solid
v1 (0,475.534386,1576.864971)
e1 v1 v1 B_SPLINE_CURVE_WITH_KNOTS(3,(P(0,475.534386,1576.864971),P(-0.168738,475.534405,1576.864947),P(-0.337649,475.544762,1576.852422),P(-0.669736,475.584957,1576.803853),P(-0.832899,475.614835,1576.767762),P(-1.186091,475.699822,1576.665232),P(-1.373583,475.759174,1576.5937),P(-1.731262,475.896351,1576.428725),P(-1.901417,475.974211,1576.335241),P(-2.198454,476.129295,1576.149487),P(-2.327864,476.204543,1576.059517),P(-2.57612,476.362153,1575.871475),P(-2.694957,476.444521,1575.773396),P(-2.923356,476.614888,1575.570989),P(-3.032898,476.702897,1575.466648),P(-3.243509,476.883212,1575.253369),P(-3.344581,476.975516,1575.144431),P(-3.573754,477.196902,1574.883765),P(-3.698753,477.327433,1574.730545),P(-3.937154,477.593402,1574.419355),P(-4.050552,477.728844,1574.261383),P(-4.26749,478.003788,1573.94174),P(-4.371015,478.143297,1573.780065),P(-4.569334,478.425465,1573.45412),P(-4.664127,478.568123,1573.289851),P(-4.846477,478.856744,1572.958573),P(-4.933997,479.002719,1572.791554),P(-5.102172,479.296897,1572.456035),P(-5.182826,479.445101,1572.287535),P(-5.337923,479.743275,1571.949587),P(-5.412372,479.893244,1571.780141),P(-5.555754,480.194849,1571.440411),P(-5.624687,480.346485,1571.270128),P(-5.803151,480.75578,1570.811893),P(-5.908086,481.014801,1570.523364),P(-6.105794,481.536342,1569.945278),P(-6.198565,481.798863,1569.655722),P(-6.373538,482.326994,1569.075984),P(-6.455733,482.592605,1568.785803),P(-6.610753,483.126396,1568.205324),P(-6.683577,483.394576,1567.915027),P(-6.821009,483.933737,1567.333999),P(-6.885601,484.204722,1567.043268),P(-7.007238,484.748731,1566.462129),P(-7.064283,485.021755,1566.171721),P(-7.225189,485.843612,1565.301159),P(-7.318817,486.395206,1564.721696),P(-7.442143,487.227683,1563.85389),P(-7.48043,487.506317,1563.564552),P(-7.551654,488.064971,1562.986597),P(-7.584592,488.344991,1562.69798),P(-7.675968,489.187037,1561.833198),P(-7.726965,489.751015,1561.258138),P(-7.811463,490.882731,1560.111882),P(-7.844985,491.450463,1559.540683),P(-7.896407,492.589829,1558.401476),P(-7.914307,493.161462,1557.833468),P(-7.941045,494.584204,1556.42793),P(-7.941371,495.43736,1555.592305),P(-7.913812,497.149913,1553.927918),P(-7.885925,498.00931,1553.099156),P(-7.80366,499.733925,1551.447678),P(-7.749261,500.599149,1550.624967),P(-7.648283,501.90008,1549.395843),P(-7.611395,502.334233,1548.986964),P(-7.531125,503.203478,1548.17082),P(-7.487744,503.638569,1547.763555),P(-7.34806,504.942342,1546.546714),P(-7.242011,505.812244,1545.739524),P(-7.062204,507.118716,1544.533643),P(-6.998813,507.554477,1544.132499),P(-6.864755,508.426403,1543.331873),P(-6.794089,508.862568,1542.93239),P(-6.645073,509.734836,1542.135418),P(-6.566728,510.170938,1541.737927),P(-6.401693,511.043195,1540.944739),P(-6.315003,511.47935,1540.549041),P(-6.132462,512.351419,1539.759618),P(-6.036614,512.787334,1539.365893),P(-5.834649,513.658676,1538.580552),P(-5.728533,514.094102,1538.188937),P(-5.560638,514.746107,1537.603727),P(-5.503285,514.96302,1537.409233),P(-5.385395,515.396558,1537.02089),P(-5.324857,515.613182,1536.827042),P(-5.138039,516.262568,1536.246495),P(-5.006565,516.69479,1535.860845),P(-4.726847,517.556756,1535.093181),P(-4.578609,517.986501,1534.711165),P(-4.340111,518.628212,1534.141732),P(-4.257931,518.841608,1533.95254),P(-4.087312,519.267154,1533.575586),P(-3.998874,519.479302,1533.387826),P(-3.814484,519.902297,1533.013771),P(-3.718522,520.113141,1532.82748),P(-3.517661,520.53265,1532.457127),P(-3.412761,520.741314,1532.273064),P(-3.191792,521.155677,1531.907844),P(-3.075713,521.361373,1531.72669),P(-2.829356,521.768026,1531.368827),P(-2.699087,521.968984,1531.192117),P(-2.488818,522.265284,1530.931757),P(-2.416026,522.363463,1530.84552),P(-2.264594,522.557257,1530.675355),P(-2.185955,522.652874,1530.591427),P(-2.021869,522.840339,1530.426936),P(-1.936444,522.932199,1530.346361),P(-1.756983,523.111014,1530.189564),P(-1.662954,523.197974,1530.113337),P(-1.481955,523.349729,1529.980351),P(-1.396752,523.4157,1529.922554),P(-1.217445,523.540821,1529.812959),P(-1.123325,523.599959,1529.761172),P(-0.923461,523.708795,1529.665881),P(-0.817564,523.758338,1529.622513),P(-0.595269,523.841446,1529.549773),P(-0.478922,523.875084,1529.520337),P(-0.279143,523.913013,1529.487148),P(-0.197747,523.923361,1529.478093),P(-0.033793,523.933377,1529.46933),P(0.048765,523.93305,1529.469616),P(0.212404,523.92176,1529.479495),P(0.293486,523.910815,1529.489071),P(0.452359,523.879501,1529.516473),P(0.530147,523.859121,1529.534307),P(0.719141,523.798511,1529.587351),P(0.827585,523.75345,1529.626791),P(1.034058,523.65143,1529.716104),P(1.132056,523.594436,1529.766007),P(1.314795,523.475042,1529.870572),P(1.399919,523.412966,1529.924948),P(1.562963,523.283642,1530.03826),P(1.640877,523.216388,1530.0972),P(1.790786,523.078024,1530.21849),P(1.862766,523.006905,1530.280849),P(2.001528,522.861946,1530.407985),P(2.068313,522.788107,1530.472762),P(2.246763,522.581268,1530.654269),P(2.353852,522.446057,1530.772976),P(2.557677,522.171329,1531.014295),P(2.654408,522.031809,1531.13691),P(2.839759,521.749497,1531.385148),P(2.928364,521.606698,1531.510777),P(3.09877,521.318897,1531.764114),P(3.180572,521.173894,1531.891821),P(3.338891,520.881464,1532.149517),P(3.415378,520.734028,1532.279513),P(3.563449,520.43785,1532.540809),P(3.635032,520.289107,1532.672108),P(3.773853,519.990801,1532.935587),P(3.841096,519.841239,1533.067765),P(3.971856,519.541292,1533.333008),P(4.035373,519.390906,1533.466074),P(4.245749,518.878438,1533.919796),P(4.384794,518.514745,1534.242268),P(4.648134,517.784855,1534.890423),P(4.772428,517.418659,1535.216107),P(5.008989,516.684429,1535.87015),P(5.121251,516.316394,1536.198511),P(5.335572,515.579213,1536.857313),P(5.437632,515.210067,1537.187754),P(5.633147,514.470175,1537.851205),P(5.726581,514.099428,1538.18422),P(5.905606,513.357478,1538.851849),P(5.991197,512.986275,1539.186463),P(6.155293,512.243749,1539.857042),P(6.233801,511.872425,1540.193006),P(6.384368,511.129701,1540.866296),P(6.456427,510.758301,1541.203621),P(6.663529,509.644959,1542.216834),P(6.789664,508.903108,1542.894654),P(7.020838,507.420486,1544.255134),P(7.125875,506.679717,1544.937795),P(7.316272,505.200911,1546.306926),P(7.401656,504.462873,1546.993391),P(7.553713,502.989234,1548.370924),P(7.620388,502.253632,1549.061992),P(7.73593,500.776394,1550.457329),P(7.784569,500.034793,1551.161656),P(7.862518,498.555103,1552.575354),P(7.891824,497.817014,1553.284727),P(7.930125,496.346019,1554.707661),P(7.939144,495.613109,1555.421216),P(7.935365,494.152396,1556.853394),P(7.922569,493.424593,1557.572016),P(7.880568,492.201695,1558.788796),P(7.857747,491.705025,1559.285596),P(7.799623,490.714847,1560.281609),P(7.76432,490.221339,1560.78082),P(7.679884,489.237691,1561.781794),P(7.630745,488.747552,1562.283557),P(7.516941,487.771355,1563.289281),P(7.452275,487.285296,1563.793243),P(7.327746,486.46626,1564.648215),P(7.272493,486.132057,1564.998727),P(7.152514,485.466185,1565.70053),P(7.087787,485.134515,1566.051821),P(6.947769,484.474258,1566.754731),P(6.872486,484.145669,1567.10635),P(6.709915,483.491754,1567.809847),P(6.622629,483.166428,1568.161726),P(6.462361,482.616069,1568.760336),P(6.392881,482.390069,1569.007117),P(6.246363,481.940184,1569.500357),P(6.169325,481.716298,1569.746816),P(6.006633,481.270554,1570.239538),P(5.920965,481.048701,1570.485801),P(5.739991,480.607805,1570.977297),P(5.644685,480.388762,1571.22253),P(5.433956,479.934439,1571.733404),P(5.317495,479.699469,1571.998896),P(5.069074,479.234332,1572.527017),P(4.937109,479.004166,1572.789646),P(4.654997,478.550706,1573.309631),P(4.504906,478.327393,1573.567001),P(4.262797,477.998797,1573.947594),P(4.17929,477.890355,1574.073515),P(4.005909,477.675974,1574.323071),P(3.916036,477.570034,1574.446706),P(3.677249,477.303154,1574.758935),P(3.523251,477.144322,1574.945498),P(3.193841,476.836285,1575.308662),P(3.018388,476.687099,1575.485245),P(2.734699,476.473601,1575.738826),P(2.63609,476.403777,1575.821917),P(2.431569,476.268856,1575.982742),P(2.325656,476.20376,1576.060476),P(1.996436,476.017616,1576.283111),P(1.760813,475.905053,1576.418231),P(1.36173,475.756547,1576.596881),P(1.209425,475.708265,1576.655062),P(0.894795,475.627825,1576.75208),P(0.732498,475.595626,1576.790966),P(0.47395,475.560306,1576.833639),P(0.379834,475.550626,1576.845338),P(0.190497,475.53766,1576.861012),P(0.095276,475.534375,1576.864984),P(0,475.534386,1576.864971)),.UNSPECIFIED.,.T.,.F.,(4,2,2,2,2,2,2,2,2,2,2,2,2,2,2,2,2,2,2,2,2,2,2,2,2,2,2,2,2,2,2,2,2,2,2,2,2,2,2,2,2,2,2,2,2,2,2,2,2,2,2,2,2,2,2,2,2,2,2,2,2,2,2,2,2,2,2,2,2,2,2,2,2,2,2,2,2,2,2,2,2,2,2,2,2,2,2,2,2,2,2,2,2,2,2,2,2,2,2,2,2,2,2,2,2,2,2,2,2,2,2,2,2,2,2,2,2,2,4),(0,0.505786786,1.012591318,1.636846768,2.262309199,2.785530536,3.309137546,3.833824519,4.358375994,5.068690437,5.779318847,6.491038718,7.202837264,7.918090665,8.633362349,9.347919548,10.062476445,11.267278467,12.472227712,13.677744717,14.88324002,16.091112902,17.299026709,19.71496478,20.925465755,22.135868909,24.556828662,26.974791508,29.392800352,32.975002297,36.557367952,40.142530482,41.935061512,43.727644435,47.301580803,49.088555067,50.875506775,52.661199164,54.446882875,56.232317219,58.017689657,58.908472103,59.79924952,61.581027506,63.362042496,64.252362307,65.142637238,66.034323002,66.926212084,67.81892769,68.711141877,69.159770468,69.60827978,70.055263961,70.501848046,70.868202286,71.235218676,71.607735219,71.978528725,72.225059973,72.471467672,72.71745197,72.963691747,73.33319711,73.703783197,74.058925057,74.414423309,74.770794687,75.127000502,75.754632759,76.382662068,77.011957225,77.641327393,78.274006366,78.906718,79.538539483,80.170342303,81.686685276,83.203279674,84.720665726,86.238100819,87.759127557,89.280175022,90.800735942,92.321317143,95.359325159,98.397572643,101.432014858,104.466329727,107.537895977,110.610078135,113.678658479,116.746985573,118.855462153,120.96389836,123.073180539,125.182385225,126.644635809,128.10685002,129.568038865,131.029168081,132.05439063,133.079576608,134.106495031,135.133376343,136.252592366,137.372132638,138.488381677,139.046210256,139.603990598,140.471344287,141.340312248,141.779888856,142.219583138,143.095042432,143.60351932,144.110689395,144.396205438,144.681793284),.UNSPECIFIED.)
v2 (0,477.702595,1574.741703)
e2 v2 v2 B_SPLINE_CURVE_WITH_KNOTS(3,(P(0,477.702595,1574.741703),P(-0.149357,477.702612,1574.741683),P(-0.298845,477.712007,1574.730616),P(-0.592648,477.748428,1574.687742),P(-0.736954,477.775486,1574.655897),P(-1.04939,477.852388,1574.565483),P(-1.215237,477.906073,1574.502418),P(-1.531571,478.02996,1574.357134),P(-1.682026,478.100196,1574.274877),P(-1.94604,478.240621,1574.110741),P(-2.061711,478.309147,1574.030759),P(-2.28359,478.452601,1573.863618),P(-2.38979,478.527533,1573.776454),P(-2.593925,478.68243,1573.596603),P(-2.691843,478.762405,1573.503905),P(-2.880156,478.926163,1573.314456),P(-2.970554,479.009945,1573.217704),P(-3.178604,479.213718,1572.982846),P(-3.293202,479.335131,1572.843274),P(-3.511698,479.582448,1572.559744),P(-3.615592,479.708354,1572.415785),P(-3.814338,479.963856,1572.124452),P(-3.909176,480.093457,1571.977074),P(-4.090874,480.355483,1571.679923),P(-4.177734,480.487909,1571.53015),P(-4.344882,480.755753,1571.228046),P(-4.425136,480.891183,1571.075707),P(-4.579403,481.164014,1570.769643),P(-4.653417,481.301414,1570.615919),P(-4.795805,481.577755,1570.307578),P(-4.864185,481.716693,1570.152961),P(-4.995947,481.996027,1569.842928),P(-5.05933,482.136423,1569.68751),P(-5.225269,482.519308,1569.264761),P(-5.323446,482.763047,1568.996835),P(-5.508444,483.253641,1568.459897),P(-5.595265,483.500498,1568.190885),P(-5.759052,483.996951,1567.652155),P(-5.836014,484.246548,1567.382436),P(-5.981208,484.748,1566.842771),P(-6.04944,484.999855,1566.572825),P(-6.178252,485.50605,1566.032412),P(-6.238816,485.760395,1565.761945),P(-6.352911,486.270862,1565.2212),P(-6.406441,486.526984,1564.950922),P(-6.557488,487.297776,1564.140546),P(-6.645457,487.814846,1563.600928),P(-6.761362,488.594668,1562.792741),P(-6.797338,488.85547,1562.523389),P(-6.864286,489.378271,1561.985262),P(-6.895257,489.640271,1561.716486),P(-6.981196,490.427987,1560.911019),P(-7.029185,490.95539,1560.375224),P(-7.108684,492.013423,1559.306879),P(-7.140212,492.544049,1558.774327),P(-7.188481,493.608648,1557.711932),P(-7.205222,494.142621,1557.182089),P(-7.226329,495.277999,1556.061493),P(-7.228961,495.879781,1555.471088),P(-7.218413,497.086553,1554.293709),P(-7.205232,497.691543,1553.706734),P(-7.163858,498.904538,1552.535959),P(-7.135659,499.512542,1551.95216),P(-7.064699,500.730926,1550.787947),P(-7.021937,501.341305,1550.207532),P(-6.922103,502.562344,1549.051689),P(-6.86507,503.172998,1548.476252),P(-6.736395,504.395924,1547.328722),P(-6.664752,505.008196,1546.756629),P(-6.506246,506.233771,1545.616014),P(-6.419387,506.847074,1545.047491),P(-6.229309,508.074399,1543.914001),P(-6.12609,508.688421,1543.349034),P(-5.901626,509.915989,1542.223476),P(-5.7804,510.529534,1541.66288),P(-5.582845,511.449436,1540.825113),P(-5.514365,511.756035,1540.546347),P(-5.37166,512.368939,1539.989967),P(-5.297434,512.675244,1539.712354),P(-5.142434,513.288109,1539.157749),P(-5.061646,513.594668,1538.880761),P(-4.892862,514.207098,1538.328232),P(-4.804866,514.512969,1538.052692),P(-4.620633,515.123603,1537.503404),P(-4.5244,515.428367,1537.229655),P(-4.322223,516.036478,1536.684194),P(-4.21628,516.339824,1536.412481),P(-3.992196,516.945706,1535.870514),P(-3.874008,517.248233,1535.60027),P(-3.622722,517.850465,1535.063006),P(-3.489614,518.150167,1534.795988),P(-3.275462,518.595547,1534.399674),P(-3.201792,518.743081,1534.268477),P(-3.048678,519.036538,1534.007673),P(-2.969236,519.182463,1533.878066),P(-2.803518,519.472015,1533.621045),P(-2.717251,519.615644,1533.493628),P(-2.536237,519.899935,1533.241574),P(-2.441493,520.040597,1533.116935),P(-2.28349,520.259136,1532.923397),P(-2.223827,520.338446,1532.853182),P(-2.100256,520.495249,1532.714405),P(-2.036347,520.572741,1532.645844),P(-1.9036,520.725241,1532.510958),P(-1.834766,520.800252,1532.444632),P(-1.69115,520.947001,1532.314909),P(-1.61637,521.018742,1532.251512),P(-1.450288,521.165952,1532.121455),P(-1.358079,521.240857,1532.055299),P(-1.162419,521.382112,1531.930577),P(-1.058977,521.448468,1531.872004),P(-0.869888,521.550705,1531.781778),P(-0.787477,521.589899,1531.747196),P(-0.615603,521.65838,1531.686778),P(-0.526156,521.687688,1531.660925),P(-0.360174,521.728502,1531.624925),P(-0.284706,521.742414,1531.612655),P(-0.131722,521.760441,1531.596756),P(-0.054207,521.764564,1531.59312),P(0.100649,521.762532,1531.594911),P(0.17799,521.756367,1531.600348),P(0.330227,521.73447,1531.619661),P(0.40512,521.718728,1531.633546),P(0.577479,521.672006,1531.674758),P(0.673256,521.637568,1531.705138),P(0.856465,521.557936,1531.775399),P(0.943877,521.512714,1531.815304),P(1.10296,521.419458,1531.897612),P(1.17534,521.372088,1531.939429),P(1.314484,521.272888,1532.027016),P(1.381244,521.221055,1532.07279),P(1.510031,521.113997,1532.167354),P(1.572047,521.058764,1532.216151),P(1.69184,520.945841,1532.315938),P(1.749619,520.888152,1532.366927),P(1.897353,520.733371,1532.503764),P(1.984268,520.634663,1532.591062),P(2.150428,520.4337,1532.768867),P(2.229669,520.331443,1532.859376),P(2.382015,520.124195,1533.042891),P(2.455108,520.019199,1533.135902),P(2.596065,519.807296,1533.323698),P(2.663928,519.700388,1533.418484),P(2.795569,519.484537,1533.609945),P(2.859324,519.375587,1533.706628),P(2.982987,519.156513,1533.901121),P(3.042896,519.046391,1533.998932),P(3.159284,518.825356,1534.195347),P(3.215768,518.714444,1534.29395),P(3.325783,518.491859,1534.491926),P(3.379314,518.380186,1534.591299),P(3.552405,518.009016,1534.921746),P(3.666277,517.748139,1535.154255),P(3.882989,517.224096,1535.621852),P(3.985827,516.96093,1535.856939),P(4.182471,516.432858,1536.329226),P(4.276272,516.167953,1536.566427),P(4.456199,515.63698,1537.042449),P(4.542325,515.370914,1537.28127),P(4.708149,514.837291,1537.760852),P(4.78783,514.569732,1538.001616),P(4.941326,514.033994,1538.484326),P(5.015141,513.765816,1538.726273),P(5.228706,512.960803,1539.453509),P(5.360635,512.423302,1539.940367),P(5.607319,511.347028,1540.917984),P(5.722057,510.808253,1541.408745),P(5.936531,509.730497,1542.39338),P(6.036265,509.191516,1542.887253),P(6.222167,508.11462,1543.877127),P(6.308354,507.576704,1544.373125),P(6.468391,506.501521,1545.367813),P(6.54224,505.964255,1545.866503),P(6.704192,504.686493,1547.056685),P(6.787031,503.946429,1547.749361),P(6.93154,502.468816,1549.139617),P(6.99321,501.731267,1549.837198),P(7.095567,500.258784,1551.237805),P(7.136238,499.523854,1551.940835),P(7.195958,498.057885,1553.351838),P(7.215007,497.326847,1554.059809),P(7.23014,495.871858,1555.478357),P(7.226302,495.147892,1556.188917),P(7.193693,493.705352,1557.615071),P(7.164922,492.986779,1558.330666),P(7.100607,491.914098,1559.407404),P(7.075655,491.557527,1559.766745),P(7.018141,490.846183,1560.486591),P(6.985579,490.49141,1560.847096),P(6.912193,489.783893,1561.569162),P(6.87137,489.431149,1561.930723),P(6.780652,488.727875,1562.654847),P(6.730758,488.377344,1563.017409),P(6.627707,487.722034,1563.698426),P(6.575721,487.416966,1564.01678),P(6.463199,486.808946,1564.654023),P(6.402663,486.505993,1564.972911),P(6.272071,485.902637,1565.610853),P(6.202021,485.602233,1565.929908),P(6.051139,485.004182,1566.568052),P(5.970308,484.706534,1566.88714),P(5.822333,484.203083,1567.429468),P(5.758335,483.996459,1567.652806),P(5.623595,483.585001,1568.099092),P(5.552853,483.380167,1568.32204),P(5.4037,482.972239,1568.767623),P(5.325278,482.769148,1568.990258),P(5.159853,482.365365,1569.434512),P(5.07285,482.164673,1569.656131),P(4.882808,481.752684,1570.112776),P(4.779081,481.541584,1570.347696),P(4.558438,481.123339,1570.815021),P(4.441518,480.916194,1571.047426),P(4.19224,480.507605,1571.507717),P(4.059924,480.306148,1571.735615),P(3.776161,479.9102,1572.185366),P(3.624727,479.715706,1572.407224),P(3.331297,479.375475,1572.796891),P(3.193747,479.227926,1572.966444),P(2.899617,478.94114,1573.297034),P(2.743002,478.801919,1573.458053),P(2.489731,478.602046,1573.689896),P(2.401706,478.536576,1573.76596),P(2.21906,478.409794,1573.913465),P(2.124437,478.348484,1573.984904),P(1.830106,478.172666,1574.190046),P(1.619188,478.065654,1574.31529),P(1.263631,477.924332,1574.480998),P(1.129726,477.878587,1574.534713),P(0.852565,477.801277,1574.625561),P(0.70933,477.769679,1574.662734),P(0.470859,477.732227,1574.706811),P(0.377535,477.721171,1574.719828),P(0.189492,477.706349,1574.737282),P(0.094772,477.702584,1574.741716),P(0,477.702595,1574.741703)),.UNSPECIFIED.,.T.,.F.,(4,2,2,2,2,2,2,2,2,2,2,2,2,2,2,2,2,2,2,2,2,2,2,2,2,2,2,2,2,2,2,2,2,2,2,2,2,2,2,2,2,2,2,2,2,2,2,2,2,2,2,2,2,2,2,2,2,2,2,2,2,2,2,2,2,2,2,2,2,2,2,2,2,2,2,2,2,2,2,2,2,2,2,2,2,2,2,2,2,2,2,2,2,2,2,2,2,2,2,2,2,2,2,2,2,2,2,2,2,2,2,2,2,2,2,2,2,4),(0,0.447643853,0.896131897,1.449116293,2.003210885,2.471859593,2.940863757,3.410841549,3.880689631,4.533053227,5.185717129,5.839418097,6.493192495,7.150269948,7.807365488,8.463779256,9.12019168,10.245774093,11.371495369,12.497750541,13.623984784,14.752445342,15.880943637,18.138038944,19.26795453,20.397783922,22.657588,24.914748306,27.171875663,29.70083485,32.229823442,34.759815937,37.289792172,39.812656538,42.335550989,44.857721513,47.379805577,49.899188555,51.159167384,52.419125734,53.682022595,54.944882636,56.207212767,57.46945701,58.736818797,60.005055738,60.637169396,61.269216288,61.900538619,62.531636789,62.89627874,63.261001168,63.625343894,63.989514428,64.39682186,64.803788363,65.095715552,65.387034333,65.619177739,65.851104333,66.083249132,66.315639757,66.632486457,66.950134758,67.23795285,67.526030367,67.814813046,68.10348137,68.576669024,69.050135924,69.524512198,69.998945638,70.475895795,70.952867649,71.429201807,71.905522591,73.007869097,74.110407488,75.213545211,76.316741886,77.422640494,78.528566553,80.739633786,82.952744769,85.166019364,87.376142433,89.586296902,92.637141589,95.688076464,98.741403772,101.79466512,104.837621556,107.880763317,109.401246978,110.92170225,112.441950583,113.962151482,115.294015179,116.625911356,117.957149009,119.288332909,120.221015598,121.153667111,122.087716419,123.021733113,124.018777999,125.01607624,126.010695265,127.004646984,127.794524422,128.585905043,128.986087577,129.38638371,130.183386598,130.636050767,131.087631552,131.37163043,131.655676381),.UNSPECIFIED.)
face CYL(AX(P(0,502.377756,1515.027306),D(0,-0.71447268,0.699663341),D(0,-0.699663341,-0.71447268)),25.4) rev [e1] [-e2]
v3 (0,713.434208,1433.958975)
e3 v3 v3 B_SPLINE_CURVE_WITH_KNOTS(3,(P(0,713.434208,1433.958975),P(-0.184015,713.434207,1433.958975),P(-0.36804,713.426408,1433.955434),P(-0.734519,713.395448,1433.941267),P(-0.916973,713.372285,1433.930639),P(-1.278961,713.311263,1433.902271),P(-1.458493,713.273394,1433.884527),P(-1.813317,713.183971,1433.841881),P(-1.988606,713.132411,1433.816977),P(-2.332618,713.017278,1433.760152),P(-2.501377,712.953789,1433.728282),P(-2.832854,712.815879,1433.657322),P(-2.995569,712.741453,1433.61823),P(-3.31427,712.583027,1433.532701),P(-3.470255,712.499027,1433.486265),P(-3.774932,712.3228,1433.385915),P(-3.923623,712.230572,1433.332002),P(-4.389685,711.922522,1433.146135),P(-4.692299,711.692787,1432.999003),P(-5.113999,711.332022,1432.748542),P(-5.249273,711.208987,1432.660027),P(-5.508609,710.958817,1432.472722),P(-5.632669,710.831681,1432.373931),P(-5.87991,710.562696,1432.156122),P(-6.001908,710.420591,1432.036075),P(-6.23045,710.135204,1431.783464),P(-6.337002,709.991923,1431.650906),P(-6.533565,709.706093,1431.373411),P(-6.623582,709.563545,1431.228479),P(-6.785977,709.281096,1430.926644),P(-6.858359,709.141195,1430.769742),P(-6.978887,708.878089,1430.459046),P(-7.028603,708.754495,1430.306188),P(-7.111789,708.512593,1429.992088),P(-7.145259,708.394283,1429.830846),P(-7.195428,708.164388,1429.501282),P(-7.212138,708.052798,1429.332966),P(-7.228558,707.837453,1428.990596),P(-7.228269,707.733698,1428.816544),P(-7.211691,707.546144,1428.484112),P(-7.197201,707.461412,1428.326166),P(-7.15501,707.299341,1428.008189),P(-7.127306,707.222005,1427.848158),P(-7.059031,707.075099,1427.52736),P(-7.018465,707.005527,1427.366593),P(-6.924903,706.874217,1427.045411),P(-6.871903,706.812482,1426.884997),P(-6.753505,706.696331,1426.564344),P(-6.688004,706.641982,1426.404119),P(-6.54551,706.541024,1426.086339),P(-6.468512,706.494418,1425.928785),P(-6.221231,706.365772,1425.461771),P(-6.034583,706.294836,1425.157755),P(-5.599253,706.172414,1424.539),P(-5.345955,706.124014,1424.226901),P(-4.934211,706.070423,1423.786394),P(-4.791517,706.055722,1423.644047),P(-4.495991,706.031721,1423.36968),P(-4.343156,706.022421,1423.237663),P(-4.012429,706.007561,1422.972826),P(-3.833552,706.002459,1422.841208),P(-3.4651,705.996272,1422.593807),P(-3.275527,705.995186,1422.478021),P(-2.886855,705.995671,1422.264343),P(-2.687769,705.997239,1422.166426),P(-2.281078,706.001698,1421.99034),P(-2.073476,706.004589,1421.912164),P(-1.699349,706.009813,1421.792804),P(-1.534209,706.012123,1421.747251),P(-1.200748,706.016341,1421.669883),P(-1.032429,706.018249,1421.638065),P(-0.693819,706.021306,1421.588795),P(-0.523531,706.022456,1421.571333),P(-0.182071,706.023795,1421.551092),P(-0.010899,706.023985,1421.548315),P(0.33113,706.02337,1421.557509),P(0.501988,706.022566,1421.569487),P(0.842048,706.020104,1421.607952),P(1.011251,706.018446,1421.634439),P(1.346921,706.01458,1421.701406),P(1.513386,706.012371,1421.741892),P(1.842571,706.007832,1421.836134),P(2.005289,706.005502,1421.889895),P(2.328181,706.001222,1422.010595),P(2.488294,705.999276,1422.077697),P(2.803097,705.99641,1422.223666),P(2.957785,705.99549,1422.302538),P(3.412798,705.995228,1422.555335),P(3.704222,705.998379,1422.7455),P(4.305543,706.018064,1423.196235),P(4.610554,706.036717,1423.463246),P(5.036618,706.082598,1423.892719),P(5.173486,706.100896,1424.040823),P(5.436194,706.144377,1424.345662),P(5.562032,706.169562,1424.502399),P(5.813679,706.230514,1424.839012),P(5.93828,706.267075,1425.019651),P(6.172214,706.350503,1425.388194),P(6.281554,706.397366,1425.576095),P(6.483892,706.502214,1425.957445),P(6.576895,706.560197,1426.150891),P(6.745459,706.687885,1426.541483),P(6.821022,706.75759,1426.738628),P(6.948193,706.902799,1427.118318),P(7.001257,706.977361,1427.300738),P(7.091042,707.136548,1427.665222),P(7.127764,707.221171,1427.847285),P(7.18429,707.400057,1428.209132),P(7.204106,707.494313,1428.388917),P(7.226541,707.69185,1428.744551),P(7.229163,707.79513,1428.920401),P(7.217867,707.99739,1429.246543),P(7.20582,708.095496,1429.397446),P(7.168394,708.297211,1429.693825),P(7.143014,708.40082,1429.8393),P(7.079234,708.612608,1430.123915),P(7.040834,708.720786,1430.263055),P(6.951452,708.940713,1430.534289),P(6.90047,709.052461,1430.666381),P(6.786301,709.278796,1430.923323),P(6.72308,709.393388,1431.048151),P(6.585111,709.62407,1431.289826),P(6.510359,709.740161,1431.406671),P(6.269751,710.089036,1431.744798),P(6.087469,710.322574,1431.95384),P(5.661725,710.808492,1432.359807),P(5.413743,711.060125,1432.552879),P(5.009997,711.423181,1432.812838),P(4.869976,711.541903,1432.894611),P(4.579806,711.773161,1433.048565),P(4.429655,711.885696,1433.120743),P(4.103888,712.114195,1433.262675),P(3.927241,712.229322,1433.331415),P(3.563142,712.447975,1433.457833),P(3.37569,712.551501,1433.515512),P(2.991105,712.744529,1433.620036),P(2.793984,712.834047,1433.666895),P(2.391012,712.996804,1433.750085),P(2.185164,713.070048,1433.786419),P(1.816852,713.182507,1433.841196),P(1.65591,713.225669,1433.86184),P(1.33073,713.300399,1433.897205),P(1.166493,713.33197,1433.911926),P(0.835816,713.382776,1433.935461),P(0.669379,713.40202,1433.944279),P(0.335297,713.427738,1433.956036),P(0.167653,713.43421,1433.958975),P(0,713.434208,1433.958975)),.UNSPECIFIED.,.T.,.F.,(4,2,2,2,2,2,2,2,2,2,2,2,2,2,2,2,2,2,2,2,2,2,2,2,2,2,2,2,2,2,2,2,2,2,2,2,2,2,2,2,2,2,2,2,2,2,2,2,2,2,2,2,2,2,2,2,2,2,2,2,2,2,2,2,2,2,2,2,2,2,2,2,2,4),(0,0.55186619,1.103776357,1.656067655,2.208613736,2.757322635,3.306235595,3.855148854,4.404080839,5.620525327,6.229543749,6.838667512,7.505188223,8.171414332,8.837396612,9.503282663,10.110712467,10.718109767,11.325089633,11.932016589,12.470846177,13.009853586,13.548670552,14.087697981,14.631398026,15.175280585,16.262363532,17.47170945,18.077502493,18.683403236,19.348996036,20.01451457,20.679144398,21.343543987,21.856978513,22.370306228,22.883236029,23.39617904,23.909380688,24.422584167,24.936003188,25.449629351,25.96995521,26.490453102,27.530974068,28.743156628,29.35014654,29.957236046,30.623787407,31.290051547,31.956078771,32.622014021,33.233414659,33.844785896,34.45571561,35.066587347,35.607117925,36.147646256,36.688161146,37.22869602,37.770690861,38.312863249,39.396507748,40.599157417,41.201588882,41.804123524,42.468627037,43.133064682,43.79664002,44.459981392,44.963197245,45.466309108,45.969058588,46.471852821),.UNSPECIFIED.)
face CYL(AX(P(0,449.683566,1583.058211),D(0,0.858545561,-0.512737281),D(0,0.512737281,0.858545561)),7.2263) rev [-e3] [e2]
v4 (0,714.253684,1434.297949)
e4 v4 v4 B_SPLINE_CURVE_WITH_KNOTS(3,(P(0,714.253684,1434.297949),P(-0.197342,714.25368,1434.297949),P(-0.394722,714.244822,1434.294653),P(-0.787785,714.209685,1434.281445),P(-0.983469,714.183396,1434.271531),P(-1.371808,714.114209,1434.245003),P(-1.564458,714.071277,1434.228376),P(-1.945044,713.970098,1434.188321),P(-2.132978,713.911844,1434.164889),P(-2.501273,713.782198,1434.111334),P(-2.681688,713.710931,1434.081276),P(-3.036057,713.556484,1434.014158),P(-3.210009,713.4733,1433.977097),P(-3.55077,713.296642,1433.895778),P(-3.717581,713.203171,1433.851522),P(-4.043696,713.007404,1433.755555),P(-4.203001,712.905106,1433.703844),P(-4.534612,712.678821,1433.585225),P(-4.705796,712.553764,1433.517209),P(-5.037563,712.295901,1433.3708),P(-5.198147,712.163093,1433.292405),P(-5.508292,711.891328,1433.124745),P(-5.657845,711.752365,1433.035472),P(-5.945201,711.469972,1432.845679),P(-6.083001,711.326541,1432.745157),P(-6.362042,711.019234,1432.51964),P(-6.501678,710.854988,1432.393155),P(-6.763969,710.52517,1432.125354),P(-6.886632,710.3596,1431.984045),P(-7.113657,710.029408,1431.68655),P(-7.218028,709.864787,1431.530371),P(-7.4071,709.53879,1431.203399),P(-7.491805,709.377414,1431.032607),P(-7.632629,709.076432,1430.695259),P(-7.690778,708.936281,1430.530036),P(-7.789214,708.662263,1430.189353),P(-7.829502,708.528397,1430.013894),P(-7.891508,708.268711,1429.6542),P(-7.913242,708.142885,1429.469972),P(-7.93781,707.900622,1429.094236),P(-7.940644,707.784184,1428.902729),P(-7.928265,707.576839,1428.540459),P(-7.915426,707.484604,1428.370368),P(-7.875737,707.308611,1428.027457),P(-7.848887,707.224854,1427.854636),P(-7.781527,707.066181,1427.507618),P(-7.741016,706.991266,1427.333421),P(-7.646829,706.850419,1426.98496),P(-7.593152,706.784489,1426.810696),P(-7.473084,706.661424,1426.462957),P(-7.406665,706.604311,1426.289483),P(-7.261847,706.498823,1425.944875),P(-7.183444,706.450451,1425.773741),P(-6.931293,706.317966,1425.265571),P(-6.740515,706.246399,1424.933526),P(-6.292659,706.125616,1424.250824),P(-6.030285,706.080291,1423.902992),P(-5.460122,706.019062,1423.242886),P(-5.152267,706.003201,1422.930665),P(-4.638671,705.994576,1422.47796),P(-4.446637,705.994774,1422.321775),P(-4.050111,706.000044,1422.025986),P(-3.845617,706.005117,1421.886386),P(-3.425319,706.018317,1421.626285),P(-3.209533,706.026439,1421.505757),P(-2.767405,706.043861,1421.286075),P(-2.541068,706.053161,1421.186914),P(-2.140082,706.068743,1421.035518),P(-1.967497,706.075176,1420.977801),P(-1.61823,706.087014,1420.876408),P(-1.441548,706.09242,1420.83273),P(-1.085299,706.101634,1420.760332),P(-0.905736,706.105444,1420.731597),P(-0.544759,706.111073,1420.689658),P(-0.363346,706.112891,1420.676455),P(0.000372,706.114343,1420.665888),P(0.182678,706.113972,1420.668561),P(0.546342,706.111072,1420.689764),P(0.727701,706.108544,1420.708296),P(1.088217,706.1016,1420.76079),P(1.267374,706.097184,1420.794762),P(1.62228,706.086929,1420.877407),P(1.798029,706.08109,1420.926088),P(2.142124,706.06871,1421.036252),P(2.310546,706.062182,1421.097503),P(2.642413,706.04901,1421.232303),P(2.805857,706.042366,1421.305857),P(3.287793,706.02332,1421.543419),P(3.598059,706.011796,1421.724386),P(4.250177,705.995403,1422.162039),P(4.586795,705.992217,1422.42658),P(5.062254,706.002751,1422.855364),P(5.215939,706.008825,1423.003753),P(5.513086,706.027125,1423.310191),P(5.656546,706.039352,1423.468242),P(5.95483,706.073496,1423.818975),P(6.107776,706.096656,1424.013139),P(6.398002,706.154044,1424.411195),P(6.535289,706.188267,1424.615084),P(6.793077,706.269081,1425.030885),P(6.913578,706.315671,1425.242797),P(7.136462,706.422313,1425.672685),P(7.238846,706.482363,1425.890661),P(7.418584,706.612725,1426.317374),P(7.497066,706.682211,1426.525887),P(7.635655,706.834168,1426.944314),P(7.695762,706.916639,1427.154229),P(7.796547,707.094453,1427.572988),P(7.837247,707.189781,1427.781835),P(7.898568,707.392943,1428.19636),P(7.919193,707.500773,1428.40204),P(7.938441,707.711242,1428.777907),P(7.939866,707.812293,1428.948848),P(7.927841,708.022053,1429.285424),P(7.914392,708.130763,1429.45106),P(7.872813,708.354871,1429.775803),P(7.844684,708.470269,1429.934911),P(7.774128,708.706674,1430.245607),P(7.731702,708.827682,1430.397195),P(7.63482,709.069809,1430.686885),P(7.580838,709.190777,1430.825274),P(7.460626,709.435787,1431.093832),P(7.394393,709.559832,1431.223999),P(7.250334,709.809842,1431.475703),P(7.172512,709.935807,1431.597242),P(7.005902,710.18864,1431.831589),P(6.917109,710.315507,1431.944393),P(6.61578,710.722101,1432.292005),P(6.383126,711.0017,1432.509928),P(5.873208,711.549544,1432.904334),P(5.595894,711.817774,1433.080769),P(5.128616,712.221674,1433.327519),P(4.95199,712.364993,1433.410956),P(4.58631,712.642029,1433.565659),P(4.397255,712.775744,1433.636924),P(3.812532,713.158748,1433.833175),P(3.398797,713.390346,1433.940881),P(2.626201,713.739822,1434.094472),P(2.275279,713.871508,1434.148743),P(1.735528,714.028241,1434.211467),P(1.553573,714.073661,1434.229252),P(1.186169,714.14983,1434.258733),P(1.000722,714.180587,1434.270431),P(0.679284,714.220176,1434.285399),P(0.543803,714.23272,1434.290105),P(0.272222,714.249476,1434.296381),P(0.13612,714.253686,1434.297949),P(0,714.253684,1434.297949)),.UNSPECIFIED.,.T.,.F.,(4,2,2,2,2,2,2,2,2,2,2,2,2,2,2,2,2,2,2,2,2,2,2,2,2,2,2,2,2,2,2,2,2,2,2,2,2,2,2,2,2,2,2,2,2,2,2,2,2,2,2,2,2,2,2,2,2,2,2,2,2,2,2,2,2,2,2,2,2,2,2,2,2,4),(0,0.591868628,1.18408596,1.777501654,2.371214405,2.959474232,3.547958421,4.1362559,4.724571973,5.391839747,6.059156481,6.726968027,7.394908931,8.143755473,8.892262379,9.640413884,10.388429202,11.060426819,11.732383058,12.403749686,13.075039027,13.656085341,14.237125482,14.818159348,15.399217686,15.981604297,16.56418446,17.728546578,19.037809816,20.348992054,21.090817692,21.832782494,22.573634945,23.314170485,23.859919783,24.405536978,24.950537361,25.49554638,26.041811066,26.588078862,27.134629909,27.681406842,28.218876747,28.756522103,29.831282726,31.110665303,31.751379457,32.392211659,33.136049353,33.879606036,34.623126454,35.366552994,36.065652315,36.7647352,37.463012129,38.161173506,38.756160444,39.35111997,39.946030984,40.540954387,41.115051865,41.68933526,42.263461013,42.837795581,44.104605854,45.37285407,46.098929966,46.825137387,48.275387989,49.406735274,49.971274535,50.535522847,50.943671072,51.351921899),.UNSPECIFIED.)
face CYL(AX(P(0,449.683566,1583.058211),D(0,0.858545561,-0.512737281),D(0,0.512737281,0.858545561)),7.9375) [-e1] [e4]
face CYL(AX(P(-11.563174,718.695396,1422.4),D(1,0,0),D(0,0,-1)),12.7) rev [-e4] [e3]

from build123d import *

# Parameters (mm, degrees)
BOSS_EXTRUDE1_OUTLINE_R   = 7.9375
BOSS_EXTRUDE1_OUTLINE_R_2 = 7.2263
BOSS_EXTRUDE1_DEPTH       = 287.964754837
BOSS_EXTRUDE1_START       = -765
BOSS_EXTRUDE1_2_DEPTH     = 284.980617027
CUT_EXTRUDE1_DEPTH        = 1735.634181442
CUT_EXTRUDE1_DEPTH_BACK   = 1735.634181442
SKETCH3_R                 = 12.7


with BuildPart() as part:
    # Boss-Extrude1: read off the stored shape, not the designer's step
    # Boss-Extrude1 outline → Boss-Extrude1 (new body)
    with BuildSketch(Plane(origin=(0, 718.69539577, 1422.4), x_dir=(-1, 0, 0), z_dir=(0, -0.8585455614781596, 0.5127372805503339))):
        Circle(BOSS_EXTRUDE1_OUTLINE_R)
        Circle(BOSS_EXTRUDE1_OUTLINE_R_2, mode=Mode.SUBTRACT)
    extrude(amount=BOSS_EXTRUDE1_DEPTH)

    # Boss-Extrude1 2 outline → Boss-Extrude1 2 (cut)
    with BuildSketch(Plane(origin=(0, 0, 0), x_dir=(1, 0, 0), z_dir=(0, 0.714472679632801, -0.699663340513368)).offset(BOSS_EXTRUDE1_START)):
        with BuildLine():
            ThreePointArc((-7.937568699, -1458.068806452), (-7.371e-06, -1459.340917959), (7.937554695, -1458.068811059))
            Line((7.937554695, -1458.068811059), (9, -1457.719289545))
            Line((9, -1457.719289545), (9, -1442))
            Line((9, -1442), (-9, -1442))
            Line((-9, -1442), (-9, -1457.719288862))
            Line((-9, -1457.719288862), (-7.937568699, -1458.068806452))
        make_face()
    extrude(amount=BOSS_EXTRUDE1_2_DEPTH, mode=Mode.SUBTRACT)

    # Sketch3 → Cut-Extrude1 (cut, two sides: drawn at the far end of the back side and taken through both)
    with BuildSketch(Plane(origin=(0, 0, 0), x_dir=(0, 0, -1), z_dir=(1, 0, 0)).offset(-CUT_EXTRUDE1_DEPTH_BACK)):
        with Locations((-1422.4, 718.69539577)):
            Circle(SKETCH3_R)
    extrude(amount=CUT_EXTRUDE1_DEPTH + CUT_EXTRUDE1_DEPTH_BACK, mode=Mode.SUBTRACT)


solid = part.part
